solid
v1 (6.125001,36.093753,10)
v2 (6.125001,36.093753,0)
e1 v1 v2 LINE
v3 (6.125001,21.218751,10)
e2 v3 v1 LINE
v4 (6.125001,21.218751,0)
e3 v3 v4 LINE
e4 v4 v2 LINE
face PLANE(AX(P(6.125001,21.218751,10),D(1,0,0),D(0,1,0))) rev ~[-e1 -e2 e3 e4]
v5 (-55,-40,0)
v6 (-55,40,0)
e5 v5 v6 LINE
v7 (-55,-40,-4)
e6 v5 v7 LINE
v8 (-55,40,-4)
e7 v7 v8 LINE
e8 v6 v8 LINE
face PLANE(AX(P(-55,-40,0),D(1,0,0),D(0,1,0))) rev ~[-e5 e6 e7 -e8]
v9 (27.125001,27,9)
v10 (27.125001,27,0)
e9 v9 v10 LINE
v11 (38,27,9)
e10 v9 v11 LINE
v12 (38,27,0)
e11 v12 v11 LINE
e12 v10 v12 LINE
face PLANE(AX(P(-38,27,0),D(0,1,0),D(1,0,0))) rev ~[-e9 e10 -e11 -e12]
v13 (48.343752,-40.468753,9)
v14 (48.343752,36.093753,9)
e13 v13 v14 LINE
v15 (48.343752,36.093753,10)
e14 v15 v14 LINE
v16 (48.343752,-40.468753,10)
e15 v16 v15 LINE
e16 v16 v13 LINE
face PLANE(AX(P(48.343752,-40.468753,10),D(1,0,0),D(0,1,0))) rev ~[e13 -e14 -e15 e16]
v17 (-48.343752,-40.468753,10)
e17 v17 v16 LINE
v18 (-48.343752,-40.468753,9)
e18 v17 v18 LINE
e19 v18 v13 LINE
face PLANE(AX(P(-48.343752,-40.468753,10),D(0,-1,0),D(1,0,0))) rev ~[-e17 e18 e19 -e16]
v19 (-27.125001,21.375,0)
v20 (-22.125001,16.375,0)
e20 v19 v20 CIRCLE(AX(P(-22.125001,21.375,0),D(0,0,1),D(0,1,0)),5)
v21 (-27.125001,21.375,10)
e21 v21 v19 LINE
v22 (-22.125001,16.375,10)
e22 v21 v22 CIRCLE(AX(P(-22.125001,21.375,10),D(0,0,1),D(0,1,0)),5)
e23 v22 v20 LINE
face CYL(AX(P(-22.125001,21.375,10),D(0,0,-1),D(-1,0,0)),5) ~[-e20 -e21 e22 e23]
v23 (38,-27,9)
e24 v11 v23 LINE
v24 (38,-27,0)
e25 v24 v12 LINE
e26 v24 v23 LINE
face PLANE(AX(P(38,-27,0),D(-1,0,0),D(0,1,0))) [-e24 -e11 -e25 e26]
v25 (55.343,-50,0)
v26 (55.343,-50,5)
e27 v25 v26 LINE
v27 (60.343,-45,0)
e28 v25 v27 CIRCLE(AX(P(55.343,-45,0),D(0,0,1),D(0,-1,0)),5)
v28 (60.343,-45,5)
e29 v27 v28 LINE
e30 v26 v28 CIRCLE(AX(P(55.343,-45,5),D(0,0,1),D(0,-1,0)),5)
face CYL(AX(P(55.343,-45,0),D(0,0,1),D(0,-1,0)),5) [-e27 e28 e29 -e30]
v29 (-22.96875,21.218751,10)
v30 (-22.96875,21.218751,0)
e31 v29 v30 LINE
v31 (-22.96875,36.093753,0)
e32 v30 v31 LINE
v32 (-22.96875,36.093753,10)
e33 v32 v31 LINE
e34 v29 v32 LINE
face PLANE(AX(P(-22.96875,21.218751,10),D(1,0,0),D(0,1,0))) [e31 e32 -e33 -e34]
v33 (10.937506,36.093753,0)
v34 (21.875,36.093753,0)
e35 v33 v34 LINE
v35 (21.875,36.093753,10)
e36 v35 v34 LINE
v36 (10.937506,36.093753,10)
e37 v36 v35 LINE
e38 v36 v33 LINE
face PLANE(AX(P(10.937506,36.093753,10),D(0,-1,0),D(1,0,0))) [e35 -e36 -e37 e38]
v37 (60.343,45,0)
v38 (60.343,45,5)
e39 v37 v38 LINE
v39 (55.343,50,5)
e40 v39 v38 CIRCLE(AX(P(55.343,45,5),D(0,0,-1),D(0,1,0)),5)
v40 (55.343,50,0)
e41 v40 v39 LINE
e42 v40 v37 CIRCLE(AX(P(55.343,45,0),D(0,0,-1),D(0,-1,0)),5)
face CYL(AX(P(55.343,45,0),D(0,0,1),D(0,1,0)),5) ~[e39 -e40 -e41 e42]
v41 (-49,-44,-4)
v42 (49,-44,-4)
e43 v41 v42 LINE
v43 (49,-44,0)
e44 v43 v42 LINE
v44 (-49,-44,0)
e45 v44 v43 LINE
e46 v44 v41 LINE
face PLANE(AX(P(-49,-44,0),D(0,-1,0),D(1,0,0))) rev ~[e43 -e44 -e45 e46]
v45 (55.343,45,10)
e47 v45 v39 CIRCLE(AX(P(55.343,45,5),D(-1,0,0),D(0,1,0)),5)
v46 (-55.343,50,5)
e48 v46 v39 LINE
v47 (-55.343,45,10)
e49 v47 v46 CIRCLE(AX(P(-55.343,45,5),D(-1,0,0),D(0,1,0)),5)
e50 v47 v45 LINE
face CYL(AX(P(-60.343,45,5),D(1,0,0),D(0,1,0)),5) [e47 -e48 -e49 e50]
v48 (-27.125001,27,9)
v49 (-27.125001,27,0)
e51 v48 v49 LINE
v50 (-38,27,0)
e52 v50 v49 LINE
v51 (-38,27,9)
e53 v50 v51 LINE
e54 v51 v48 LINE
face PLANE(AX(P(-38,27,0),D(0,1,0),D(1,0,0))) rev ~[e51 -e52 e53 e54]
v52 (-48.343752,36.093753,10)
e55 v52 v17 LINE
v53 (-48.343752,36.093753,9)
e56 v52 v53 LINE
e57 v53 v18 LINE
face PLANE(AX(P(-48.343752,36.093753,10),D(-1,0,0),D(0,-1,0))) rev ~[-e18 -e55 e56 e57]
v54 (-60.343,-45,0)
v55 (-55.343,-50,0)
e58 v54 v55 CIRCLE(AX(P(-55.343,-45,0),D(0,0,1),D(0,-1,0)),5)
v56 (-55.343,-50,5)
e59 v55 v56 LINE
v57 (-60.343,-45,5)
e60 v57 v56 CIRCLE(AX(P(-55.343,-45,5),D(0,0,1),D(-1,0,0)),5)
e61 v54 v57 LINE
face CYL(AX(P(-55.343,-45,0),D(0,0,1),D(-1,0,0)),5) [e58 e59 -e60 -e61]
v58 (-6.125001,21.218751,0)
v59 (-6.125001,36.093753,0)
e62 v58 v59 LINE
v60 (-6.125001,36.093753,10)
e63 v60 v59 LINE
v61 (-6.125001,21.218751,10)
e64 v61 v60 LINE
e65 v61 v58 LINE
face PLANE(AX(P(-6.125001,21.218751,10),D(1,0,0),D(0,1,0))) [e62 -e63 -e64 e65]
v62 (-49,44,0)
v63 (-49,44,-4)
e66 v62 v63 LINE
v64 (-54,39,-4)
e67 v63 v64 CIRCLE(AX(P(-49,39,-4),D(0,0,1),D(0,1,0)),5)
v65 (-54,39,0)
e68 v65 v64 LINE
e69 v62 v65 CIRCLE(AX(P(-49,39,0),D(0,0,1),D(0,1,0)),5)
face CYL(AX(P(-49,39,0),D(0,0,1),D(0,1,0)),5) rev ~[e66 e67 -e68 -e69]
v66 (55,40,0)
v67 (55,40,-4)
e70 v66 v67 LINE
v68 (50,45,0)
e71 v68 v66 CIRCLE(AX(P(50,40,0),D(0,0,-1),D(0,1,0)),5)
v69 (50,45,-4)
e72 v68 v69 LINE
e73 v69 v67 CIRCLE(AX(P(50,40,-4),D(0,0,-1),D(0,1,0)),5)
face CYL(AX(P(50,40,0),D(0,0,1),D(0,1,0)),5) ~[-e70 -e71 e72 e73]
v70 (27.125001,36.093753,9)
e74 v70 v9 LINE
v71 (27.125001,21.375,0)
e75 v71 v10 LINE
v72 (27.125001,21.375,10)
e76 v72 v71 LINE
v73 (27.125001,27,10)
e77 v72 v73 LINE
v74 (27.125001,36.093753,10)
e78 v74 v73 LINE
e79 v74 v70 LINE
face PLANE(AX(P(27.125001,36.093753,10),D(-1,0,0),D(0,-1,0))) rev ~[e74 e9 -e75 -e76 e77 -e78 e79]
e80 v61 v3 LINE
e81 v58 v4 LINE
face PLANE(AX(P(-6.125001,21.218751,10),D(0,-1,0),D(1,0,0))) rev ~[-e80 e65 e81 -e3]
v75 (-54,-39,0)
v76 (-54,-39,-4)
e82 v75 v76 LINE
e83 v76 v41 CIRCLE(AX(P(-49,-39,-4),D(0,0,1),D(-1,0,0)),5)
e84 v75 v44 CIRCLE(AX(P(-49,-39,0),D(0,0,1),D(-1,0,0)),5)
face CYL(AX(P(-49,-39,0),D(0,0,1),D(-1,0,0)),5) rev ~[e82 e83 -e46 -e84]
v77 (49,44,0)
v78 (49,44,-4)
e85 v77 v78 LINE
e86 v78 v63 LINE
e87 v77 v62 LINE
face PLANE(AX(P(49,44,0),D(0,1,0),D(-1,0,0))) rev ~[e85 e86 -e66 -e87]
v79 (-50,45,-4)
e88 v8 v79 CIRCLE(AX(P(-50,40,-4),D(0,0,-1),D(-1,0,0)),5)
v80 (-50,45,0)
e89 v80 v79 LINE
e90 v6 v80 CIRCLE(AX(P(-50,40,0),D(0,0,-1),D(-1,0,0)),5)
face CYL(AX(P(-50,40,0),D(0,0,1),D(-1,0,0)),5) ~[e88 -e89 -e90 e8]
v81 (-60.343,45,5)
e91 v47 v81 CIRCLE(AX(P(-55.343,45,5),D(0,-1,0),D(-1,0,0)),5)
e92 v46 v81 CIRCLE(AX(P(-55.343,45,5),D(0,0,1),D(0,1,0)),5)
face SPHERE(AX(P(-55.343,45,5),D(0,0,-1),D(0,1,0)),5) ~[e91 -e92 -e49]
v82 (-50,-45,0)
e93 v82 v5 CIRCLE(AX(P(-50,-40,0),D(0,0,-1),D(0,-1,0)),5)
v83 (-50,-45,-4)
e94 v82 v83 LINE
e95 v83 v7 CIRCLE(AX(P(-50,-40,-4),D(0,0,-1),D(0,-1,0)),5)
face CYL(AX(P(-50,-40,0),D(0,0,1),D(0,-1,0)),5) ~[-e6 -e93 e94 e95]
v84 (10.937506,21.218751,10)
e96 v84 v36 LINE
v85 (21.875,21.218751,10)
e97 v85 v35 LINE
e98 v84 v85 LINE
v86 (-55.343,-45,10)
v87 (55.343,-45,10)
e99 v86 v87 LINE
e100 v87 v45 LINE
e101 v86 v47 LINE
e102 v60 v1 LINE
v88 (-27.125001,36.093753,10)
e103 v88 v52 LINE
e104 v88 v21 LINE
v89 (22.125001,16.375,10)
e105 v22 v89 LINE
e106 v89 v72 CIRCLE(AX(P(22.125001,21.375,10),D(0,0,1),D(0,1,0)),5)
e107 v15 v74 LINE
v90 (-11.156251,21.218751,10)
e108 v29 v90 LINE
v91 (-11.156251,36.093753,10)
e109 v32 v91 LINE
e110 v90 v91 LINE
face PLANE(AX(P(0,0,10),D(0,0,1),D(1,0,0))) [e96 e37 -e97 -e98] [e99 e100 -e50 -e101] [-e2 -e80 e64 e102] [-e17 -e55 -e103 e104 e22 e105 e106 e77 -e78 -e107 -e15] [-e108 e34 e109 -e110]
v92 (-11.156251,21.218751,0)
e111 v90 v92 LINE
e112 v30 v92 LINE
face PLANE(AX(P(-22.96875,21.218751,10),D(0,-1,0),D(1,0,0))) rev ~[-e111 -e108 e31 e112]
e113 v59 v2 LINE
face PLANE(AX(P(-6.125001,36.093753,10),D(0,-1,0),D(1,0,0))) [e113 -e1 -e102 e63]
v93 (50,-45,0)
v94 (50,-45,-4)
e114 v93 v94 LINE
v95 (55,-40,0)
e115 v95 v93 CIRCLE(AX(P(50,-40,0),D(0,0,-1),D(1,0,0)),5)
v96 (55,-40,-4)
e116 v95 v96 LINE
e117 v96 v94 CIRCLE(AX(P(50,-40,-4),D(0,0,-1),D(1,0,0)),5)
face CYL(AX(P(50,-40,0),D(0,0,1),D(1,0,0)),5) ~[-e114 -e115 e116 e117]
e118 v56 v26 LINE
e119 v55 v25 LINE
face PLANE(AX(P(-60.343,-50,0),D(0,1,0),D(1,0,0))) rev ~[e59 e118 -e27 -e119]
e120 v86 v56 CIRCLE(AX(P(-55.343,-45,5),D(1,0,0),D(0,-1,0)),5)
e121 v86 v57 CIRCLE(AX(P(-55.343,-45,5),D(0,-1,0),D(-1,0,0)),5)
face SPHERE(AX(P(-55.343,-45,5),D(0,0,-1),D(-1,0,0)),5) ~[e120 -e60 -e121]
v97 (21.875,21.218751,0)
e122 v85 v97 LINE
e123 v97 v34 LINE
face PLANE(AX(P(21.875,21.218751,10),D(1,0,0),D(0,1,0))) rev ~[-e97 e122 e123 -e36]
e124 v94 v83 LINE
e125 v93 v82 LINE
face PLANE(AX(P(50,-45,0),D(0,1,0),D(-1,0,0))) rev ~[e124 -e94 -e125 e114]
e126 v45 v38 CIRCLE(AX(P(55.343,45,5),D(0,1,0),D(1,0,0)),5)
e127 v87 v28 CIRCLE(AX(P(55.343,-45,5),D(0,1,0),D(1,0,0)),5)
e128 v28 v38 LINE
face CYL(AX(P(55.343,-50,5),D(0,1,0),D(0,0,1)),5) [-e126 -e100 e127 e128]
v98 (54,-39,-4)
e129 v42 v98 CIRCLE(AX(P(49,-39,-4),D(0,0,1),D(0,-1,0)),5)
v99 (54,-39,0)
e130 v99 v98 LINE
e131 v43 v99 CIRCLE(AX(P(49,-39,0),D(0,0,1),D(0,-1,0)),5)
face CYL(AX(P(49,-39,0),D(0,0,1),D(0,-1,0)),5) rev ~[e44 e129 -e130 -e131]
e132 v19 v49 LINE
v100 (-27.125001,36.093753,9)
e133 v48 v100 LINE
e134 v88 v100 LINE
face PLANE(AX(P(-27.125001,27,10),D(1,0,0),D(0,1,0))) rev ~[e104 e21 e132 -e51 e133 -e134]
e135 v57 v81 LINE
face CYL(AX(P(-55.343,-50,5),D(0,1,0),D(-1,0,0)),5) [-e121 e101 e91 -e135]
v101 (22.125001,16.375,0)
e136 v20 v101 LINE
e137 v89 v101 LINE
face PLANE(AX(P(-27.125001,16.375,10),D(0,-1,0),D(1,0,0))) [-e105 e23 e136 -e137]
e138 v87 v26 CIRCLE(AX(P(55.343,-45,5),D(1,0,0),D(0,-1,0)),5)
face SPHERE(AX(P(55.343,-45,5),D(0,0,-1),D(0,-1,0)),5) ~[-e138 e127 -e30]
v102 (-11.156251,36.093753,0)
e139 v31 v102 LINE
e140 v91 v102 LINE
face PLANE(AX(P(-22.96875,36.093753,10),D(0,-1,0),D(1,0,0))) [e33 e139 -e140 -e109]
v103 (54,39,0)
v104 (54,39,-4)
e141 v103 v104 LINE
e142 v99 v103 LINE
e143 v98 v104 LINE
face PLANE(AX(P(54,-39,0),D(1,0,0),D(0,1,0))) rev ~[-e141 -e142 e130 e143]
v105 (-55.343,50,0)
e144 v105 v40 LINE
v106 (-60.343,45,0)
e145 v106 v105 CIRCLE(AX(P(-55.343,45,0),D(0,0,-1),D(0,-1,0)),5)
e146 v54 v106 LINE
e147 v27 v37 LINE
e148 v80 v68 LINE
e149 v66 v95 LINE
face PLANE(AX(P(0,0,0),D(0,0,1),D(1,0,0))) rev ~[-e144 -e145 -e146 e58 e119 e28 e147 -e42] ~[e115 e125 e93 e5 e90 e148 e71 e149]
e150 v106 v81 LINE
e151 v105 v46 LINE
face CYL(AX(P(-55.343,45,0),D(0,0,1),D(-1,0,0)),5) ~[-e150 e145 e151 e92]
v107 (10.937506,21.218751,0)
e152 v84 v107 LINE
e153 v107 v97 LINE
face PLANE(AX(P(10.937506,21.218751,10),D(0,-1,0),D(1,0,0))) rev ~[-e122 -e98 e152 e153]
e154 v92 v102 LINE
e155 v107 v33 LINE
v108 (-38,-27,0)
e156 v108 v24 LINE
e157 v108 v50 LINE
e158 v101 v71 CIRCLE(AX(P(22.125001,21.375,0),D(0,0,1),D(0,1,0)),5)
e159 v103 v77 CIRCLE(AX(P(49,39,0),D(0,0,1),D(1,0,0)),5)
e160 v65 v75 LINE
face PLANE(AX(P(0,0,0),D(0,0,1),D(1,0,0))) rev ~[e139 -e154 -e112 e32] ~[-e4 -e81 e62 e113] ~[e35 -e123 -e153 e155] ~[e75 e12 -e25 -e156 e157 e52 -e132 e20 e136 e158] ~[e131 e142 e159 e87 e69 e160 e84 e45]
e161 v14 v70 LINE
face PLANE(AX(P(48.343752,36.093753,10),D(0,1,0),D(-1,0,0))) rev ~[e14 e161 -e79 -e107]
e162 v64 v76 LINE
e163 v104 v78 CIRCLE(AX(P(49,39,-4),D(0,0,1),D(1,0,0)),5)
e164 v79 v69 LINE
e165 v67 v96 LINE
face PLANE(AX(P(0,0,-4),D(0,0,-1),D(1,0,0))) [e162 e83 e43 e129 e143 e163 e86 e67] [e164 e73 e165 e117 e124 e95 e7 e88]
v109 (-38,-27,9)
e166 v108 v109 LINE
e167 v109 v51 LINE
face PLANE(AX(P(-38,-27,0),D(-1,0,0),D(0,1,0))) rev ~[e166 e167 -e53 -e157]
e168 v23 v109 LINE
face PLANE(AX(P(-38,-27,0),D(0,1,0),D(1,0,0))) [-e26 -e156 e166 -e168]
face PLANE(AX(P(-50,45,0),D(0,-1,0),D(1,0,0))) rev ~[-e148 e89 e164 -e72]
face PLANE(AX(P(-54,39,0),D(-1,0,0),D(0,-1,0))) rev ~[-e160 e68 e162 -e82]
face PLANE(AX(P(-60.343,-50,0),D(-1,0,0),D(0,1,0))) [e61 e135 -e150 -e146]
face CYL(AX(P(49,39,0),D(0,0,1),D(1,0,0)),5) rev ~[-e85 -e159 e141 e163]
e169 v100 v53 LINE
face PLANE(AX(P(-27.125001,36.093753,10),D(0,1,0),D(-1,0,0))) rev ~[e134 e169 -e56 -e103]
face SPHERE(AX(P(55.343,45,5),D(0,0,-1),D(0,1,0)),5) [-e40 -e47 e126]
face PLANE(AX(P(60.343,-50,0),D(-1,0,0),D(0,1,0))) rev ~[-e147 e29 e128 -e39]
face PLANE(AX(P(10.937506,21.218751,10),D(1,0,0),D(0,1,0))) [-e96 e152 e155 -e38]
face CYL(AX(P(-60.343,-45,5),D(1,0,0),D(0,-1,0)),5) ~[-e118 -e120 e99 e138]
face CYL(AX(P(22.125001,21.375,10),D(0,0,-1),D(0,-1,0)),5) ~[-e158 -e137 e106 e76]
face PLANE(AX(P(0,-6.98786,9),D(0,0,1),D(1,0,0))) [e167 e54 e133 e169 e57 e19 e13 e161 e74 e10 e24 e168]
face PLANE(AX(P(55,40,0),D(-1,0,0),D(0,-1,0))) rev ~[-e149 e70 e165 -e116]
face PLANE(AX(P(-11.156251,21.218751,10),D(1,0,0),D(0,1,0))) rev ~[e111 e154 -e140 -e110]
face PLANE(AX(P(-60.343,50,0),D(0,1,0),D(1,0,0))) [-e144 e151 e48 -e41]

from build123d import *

# Parameters (mm, degrees)
F0_W      = 120.686
F0_H      = 100
F0_W_2    = 76
F0_H_2    = 54
F1_DEPTH  = 10
F3_DEPTH  = 4
F4_R      = 5
F5_W      = 54.2500019073
F5_H      = 10.6249998808
F6_DEPTH  = 10
F8_DEPTH  = 1
F9_W      = 11.812498793
F9_H      = 14.8750022054
F9_W_2    = 12.2500015423
F9_W_3    = 10.9374932945
F10_DEPTH = 25
F11_R     = 5


# Not quite as in the source:
# - a feature names something its author has since deleted; it is built from what else it names


with BuildPart() as f1:
    # F0 (on Top) → F1 (new body)
    with BuildSketch(Plane.XY):
        Rectangle(F0_W, F0_H)
        Rectangle(F0_W_2, F0_H_2, mode=Mode.SUBTRACT)
    extrude(amount=F1_DEPTH)

    # F2 (on face) → F3 (join)
    with BuildSketch(Plane(origin=(0, 0, 0), x_dir=(1, 0, 0), z_dir=(0, 0, -1))):
        with BuildLine():
            ThreePointArc((55, 40), (53.5355339059, 43.5355339059), (50, 45))
            Line((50, 45), (-50, 45))
            ThreePointArc((-50, 45), (-53.5355339059, 43.5355339059), (-55, 40))
            Line((-55, 40), (-55, -40))
            ThreePointArc((-55, -40), (-53.5355339059, -43.5355339059), (-50, -45))
            Line((-50, -45), (50, -45))
            ThreePointArc((50, -45), (53.5355339059, -43.5355339059), (55, -40))
            Line((55, -40), (55, 40))
        make_face()
        with BuildLine():
            Line((-49, 44), (49, 44))
            ThreePointArc((49, 44), (52.5355339059, 42.5355339059), (54, 39))
            Line((54, 39), (54, -39))
            ThreePointArc((54, -39), (52.5355339059, -42.5355339059), (49, -44))
            Line((49, -44), (-49, -44))
            ThreePointArc((-49, -44), (-52.5355339059, -42.5355339059), (-54, -39))
            Line((-54, -39), (-54, 39))
            ThreePointArc((-54, 39), (-52.5355339059, 42.5355339059), (-49, 44))
        make_face(mode=Mode.SUBTRACT)
    extrude(amount=F3_DEPTH)

    # F4
    f4_edges = [f1.edges().sort_by_distance(p)[0] for p in [
        (-60.343, -50, 5),
        (60.343, -50, 5),
        (60.343, 50, 5),
        (-60.343, 50, 5),
        (0, 50, 10),
        (-60.343, 0, 10),
        (0, -50, 10),
        (60.343, 0, 10),
    ]]
    fillet(f4_edges, radius=F4_R)

    # F5 (on face) → F6 (join)
    with BuildSketch(Plane.XY.offset(10)):
        with Locations((0, 21.6875000596)):
            Rectangle(F5_W, F5_H)
    extrude(amount=-F6_DEPTH)

    # F7 (on face) → F8 (cut)
    with BuildSketch(Plane.XY.offset(10)):
        Polygon((48.3437515795, -40.4687528498), (48.3437515795, 36.0937528312), (27.1250009537, 36.0937528312), (27.1250009537, 27), (38, 27), (38, -27), (-38, -27), (-38, 27), (-27.1250009537, 27), (-27.1250009537, 36.0937528312), (-48.3437515795, 36.0937528312), (-48.3437515795, -40.4687528498), align=None)
    extrude(amount=-F8_DEPTH, mode=Mode.SUBTRACT)

    # F9 (on face) → F10 (cut)
    with BuildSketch(Plane.XY.offset(10)):
        with Locations((-17.0625001192, 28.6562517285)):
            Rectangle(F9_W, F9_H)
        with Locations((0, 28.6562517285)):
            Rectangle(F9_W_2, F9_H)
        with Locations((16.4062529802, 28.6562517285)):
            Rectangle(F9_W_3, F9_H)
    extrude(amount=-F10_DEPTH, mode=Mode.SUBTRACT)

    # F11
    f11_edges = [f1.edges().sort_by_distance(p)[0] for p in [
        (-27.125001, 16.375, 5),
        (27.125001, 16.375, 5),
    ]]
    fillet(f11_edges, radius=F11_R)


solid = f1.part
